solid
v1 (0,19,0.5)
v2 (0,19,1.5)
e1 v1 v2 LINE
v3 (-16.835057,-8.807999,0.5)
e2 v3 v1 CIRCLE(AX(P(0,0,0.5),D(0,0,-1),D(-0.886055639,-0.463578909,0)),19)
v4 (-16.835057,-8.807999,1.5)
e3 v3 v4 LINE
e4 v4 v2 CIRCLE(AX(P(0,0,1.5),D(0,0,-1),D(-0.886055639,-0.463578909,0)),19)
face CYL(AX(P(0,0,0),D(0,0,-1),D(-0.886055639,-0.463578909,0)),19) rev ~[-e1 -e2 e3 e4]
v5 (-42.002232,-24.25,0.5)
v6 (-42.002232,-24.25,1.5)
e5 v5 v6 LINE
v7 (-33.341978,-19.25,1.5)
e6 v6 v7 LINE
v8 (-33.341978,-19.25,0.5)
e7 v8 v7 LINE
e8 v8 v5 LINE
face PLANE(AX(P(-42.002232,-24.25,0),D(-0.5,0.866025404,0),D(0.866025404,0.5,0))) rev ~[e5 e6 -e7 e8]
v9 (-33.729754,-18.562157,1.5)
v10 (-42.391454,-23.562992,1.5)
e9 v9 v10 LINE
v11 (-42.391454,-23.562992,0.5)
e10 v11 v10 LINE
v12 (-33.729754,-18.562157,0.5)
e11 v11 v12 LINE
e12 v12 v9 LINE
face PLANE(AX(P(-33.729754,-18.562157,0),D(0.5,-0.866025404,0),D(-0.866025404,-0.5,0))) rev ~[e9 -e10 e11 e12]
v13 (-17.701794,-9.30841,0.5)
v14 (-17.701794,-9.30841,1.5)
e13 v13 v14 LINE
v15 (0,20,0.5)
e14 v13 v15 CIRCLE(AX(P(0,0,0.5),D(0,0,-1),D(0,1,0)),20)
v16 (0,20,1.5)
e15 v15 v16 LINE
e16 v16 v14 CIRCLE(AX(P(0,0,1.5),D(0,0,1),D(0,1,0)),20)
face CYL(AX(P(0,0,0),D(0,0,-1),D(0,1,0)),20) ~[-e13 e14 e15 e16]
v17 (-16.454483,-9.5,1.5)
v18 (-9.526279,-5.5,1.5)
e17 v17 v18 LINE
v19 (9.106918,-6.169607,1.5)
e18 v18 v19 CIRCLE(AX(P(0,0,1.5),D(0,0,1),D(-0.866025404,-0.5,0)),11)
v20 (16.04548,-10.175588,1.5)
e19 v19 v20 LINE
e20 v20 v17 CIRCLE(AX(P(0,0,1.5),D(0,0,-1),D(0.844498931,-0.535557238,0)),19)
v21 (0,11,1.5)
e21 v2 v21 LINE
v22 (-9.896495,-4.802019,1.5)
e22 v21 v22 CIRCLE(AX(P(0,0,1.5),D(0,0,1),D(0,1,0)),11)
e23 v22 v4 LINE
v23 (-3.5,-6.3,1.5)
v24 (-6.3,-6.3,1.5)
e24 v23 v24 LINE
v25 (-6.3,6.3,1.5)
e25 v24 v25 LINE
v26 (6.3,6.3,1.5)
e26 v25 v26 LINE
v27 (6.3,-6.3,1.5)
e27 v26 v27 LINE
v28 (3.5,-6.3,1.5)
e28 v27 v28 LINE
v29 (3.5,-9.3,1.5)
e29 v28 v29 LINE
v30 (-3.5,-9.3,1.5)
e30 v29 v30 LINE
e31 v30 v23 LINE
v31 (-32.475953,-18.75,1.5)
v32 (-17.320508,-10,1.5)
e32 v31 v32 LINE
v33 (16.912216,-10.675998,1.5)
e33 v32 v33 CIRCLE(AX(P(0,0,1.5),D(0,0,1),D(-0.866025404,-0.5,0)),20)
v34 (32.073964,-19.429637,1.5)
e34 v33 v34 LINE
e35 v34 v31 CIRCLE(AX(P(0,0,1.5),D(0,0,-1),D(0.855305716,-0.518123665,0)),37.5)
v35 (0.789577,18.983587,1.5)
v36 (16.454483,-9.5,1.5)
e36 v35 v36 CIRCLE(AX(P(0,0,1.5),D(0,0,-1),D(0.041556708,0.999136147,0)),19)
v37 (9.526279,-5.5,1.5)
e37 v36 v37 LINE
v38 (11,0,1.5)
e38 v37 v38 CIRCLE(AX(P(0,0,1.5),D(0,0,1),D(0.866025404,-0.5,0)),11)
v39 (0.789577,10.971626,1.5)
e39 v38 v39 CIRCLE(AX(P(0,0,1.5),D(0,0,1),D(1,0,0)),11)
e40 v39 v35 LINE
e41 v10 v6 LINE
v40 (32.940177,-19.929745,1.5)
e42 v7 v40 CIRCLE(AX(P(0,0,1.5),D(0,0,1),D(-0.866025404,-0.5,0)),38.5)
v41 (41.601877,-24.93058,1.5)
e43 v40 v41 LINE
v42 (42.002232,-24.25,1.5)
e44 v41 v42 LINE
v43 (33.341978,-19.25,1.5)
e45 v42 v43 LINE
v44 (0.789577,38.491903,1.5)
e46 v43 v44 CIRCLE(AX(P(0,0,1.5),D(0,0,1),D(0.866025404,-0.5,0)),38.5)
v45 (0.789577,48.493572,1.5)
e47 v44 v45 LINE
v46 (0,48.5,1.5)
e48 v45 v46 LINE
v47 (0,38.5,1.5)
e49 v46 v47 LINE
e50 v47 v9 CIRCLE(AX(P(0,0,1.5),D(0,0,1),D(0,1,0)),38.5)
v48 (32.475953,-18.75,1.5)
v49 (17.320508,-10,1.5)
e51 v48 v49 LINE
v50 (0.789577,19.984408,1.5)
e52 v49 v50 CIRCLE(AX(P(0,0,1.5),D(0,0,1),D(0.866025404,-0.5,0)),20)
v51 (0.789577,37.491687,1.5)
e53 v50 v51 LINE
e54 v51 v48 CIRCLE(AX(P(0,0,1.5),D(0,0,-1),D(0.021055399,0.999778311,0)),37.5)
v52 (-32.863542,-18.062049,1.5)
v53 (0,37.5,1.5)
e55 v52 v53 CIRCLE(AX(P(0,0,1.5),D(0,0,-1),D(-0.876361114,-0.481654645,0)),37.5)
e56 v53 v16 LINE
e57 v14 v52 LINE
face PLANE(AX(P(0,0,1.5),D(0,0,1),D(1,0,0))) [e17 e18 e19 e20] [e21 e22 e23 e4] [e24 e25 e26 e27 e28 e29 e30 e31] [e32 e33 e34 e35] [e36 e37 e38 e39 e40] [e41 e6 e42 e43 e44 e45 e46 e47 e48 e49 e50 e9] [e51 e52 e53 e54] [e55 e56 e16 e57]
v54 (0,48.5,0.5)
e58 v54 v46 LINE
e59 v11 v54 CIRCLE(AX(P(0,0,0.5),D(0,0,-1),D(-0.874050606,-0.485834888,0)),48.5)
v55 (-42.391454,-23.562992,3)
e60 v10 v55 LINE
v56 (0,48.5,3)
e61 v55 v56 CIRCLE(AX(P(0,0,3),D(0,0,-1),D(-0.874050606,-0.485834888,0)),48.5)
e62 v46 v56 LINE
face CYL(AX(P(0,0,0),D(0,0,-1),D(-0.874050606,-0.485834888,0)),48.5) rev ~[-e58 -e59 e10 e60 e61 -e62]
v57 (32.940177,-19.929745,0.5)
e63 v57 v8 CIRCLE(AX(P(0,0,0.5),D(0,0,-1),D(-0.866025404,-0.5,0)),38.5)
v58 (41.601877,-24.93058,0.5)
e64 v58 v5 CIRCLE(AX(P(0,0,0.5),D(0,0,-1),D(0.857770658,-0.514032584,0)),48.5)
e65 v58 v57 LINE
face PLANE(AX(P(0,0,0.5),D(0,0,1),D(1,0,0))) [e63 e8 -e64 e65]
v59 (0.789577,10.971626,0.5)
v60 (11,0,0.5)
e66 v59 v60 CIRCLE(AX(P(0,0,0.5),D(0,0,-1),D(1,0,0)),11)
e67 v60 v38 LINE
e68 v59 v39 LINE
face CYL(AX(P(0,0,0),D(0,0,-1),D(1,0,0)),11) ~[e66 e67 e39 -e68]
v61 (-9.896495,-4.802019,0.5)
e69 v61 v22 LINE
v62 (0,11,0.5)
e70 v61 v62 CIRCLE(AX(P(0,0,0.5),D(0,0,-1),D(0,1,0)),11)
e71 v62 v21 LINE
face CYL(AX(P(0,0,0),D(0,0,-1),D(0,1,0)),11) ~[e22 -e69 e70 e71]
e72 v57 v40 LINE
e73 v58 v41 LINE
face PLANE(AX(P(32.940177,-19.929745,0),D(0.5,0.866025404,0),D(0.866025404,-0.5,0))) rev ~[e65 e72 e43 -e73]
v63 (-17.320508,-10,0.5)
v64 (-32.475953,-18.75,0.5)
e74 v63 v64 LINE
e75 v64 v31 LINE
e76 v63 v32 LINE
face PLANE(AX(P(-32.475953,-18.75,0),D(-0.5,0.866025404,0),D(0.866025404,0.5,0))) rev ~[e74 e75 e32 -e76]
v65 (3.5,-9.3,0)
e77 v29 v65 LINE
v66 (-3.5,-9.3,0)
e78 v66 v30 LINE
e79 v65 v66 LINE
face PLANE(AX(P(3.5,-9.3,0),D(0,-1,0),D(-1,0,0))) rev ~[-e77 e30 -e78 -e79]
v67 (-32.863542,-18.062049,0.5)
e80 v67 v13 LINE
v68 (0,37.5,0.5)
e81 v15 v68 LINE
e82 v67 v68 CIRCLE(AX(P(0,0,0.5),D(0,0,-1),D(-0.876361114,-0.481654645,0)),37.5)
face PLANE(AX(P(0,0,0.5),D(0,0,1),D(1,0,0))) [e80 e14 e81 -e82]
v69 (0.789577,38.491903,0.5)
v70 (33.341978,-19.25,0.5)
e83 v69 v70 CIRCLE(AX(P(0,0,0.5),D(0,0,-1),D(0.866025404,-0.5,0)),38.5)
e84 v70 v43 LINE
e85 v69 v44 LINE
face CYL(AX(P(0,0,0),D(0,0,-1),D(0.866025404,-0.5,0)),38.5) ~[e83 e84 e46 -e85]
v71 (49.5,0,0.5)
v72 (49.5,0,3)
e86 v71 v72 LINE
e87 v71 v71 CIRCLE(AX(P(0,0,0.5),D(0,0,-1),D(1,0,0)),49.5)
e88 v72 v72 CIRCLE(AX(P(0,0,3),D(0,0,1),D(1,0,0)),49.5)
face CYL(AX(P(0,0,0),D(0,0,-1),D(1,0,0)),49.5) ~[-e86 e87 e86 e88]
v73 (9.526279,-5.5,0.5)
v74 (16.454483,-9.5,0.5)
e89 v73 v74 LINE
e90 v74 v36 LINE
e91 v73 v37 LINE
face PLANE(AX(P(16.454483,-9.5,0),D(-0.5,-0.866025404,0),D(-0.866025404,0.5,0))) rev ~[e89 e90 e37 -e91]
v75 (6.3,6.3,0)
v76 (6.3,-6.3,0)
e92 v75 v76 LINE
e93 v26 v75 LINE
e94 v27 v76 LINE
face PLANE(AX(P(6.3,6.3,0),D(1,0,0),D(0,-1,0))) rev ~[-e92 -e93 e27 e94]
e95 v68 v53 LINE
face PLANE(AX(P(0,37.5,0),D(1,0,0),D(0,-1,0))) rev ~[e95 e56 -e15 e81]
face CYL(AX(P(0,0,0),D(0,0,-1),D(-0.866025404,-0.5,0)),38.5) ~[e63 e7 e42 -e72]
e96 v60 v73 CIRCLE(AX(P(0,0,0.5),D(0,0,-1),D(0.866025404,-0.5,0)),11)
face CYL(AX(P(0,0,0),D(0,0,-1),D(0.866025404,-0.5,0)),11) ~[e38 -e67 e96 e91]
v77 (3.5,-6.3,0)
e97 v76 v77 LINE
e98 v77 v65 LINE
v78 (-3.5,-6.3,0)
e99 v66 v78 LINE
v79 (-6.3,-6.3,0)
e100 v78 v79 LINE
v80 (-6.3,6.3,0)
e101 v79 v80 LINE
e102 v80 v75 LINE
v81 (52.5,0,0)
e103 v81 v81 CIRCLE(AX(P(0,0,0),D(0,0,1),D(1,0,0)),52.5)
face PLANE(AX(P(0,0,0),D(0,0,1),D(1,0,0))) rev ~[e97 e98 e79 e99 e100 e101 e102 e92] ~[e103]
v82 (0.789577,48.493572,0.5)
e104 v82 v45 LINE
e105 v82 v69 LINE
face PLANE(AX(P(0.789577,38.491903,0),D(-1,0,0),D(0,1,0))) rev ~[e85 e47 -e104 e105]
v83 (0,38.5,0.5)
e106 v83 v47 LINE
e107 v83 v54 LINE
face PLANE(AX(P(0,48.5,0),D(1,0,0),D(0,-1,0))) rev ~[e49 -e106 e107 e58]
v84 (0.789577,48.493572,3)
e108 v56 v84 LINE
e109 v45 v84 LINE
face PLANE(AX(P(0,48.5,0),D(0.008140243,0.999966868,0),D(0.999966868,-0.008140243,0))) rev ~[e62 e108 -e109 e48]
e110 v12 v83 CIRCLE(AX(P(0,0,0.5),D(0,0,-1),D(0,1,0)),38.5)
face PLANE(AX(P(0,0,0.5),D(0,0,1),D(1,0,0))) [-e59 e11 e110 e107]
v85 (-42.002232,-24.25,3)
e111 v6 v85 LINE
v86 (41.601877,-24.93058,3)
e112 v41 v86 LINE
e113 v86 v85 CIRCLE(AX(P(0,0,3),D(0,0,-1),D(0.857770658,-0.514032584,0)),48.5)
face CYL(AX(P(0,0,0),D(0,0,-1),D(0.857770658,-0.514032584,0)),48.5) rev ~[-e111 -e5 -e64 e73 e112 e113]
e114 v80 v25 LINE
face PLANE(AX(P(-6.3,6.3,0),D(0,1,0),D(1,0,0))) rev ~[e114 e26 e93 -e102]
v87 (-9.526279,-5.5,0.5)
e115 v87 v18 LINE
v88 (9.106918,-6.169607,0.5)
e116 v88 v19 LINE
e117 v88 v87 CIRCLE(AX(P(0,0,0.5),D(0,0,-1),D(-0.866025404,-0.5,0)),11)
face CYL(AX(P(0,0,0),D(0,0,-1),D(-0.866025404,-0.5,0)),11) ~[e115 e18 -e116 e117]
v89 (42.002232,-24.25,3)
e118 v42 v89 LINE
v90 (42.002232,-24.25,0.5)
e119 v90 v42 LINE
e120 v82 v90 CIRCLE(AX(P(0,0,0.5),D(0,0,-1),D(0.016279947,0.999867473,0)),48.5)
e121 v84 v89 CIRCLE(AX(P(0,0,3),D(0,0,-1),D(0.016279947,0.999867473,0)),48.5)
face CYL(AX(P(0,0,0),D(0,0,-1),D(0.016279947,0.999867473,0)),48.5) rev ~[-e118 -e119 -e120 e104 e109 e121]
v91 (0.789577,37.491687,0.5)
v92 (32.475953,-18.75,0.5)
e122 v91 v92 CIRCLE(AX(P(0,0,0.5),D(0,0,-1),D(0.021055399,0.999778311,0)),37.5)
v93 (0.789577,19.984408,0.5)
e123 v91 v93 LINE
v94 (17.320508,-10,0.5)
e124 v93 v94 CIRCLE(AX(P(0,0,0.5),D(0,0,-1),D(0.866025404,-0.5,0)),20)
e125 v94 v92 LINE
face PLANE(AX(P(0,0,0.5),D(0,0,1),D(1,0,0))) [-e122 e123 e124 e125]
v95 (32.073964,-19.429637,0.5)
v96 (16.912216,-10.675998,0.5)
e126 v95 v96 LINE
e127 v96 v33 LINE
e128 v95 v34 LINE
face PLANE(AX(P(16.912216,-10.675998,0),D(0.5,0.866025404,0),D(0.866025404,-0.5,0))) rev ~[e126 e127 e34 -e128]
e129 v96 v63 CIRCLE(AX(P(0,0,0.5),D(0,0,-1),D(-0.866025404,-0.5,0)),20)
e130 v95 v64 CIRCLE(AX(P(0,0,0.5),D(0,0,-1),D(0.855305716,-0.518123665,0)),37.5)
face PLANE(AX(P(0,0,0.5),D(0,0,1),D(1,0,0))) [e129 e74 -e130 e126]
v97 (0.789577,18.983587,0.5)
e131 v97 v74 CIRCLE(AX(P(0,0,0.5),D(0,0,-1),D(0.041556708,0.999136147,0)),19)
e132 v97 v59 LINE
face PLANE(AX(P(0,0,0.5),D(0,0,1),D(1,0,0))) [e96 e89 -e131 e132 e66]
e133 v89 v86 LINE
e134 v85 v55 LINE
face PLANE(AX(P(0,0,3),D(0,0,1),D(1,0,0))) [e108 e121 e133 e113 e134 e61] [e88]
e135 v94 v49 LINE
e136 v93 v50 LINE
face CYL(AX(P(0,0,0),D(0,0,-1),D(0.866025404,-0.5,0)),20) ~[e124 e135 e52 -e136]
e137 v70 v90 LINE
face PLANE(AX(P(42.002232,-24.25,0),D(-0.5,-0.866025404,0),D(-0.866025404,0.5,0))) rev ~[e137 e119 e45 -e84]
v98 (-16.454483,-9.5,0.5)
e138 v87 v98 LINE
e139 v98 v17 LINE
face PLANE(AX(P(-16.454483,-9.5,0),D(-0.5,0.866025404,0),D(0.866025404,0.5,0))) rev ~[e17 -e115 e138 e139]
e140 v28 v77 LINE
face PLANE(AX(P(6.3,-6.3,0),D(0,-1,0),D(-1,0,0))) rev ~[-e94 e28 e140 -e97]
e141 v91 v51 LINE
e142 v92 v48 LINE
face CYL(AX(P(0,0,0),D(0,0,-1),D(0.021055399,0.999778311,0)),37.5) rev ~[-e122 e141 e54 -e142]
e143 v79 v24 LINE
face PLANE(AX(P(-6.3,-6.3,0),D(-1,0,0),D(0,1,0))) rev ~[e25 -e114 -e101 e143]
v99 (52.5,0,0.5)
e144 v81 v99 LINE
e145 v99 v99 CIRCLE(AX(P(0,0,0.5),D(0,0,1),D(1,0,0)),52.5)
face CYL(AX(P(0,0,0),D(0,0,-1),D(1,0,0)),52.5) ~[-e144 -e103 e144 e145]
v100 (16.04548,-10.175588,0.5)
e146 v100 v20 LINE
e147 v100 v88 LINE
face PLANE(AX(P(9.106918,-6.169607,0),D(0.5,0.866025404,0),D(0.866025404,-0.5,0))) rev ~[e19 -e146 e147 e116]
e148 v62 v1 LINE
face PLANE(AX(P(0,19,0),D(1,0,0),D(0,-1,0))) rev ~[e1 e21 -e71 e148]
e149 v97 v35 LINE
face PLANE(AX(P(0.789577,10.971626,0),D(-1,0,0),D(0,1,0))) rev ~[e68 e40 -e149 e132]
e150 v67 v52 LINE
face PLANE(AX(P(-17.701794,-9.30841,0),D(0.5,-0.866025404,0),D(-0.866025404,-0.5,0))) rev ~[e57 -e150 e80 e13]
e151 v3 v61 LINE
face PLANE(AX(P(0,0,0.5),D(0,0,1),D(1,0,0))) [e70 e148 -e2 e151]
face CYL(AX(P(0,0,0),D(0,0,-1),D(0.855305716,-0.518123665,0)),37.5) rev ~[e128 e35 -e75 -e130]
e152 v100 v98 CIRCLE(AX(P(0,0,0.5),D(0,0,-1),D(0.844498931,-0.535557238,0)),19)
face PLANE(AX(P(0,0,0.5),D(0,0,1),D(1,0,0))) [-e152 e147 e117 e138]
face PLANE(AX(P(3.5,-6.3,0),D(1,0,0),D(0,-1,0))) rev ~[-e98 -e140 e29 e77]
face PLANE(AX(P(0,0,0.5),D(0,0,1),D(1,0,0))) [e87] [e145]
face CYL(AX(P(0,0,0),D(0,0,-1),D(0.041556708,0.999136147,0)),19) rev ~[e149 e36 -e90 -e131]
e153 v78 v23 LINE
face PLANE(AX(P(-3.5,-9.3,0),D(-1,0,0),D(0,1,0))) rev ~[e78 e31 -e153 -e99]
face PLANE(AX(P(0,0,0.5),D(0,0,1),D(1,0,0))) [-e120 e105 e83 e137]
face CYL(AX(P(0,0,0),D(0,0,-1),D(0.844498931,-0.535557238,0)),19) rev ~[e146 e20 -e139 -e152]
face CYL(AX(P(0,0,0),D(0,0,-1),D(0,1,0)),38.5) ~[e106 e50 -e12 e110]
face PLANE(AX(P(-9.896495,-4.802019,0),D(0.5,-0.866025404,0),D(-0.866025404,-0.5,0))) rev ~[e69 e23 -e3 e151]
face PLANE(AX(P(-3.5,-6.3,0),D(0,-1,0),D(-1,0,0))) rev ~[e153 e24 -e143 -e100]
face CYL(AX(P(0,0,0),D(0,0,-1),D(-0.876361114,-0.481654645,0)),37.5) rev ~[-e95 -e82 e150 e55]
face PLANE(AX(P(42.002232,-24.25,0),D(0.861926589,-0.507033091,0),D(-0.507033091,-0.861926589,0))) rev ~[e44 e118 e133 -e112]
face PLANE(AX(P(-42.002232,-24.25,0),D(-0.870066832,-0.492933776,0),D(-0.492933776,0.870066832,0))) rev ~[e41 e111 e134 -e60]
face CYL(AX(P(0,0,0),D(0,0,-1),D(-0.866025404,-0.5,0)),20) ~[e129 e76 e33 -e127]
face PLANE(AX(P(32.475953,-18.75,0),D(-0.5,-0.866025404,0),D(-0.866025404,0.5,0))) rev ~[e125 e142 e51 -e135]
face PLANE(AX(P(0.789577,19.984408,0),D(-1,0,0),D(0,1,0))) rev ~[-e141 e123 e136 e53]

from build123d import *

# Parameters (mm, degrees)
F0_R     = 52.5
F0_R_2   = 49.5
F1_DEPTH = 0.5
F2_DEPTH = 3
F3_DEPTH = 1.5


# Not quite as in the source:
# - a feature names something its author has since deleted; it is built from what else it names


with BuildPart() as f1:
    # F0 (on Top) → F1 (new body)
    with BuildSketch(Plane.XY):
        Circle(F0_R)
        Circle(F0_R_2, mode=Mode.SUBTRACT)
        Circle(F0_R_2)
        with BuildLine():
            ThreePointArc((-42.3914543736, -23.5629920869), (-41.8034395488, 24.5911049344), (0, 48.5))
            Line((0, 48.5), (0.7895774504, 48.4935724344))
            ThreePointArc((0.7895774504, 48.4935724344), (42.1982413547, 23.9072881476), (42.0022320835, -24.25))
            Line((42.0022320835, -24.25), (41.6018769232, -24.9305803475))
            ThreePointArc((41.6018769232, -24.9305803475), (-0.3948018059, -48.498393082), (-42.0022320835, -24.25))
            Line((-42.0022320835, -24.25), (-42.3914543736, -23.5629920869))
        make_face(mode=Mode.SUBTRACT)
        with BuildLine():
            Line((0.7895774504, 48.4935724344), (0, 48.5))
            Line((0, 48.5), (0, 38.5))
            ThreePointArc((0, 38.5), (-33.1428201233, 19.5909028448), (-33.7297542357, -18.5621571806))
            Line((-33.7297542357, -18.5621571806), (-42.3914543736, -23.5629920869))
            Line((-42.3914543736, -23.5629920869), (-42.0022320835, -24.25))
            Line((-42.0022320835, -24.25), (-33.3419780457, -19.25))
            ThreePointArc((-33.3419780457, -19.25), (-0.394809485, -38.4979756022), (32.9401767853, -19.9297454412))
            Line((32.9401767853, -19.9297454412), (41.6018769232, -24.9305803475))
            Line((41.6018769232, -24.9305803475), (42.0022320835, -24.25))
            Line((42.0022320835, -24.25), (33.3419780457, -19.25))
            ThreePointArc((33.3419780457, -19.25), (33.5376296083, 18.9070727575), (0.7895774504, 38.4919026218))
            Line((0.7895774504, 38.4919026218), (0.7895774504, 48.4935724344))
        make_face()
        with BuildLine():
            ThreePointArc((32.0739643397, -19.4296374526), (-0.3948106071, -37.4979216035), (-32.4759526419, -18.75))
            Line((-32.4759526419, -18.75), (-17.3205080757, -10))
            ThreePointArc((-17.3205080757, -10), (-0.3948656915, -19.9961016472), (16.9122163764, -10.6759981846))
            Line((16.9122163764, -10.6759981846), (32.0739643397, -19.4296374526))
        make_face(mode=Mode.SUBTRACT)
        with BuildLine():
            Line((-17.7017938268, -9.308409924), (-32.8635417901, -18.0620491919))
            ThreePointArc((-32.8635417901, -18.0620491919), (-32.2767473942, 19.0908768172), (0, 37.5))
            Line((0, 37.5), (0, 20))
            ThreePointArc((0, 20), (-17.1196991574, 10.3400145435), (-17.7017938268, -9.308409924))
        make_face(mode=Mode.SUBTRACT)
        with BuildLine():
            ThreePointArc((0, 11), (0.3950435606, 10.9929041015), (0.7895774504, 10.971625561))
            Line((0.7895774504, 10.971625561), (0.7895774504, 18.983586791))
            ThreePointArc((0.7895774504, 18.983586791), (16.6483657305, 9.155977201), (16.4544826719, -9.5))
            Line((16.4544826719, -9.5), (9.5262794416, -5.5))
            ThreePointArc((9.5262794416, -5.5), (9.322612433, -5.8385698098), (9.1069177314, -6.1696069108))
            Line((9.1069177314, -6.1696069108), (16.0454796907, -10.1755875258))
            ThreePointArc((16.0454796907, -10.1755875258), (-0.3948740127, -18.9958962546), (-16.4544826719, -9.5))
            Line((-16.4544826719, -9.5), (-9.5262794416, -5.5))
            ThreePointArc((-9.5262794416, -5.5), (-9.7176559936, -5.1543342917), (-9.8964951818, -4.8020186502))
            Line((-9.8964951818, -4.8020186502), (-16.8350571411, -8.8079992652))
            ThreePointArc((-16.8350571411, -8.8079992652), (-16.2534917178, 9.8399190536), (0, 19))
            Line((0, 19), (0, 11))
        make_face(mode=Mode.SUBTRACT)
        with BuildLine():
            Line((32.4759526419, -18.75), (17.3205080757, -10))
            ThreePointArc((17.3205080757, -10), (17.5145648489, 9.6560871037), (0.7895774504, 19.9844081086))
            Line((0.7895774504, 19.9844081086), (0.7895774504, 37.4916866445))
            ThreePointArc((0.7895774504, 37.4916866445), (32.6715580013, 18.4070447863), (32.4759526419, -18.75))
        make_face(mode=Mode.SUBTRACT)
        with BuildLine():
            Line((-17.3205080757, -10), (-32.4759526419, -18.75))
            ThreePointArc((-32.4759526419, -18.75), (-0.3948106071, -37.4979216035), (32.0739643397, -19.4296374526))
            Line((32.0739643397, -19.4296374526), (16.9122163764, -10.6759981846))
            ThreePointArc((16.9122163764, -10.6759981846), (-0.3948656915, -19.9961016472), (-17.3205080757, -10))
        make_face()
        with BuildLine():
            ThreePointArc((0, 37.5), (-32.2767473942, 19.0908768172), (-32.8635417901, -18.0620491919))
            Line((-32.8635417901, -18.0620491919), (-17.7017938268, -9.308409924))
            ThreePointArc((-17.7017938268, -9.308409924), (-17.1196991574, 10.3400145435), (0, 20))
            Line((0, 20), (0, 37.5))
        make_face()
        with BuildLine():
            ThreePointArc((0.7895774504, 19.9844081086), (17.5145648489, 9.6560871037), (17.3205080757, -10))
            Line((17.3205080757, -10), (32.4759526419, -18.75))
            ThreePointArc((32.4759526419, -18.75), (32.6715580013, 18.4070447863), (0.7895774504, 37.4916866445))
            Line((0.7895774504, 37.4916866445), (0.7895774504, 19.9844081086))
        make_face()
        with BuildLine():
            Line((0, 38.5), (0, 48.5))
            ThreePointArc((0, 48.5), (-41.8034395488, 24.5911049344), (-42.3914543736, -23.5629920869))
            Line((-42.3914543736, -23.5629920869), (-33.7297542357, -18.5621571806))
            ThreePointArc((-33.7297542357, -18.5621571806), (-33.1428201233, 19.5909028448), (0, 38.5))
        make_face()
        with BuildLine():
            ThreePointArc((42.0022320835, -24.25), (42.1982413547, 23.9072881476), (0.7895774504, 48.4935724344))
            Line((0.7895774504, 48.4935724344), (0.7895774504, 38.4919026218))
            ThreePointArc((0.7895774504, 38.4919026218), (33.5376296083, 18.9070727575), (33.3419780457, -19.25))
            Line((33.3419780457, -19.25), (42.0022320835, -24.25))
        make_face()
        with BuildLine():
            Line((-33.3419780457, -19.25), (-42.0022320835, -24.25))
            ThreePointArc((-42.0022320835, -24.25), (-0.3948018059, -48.498393082), (41.6018769232, -24.9305803475))
            Line((41.6018769232, -24.9305803475), (32.9401767853, -19.9297454412))
            ThreePointArc((32.9401767853, -19.9297454412), (-0.394809485, -38.4979756022), (-33.3419780457, -19.25))
        make_face()
        with BuildLine():
            ThreePointArc((9.5262794416, -5.5), (10.6251840892, -2.8470094961), (11, 0))
            ThreePointArc((11, 0), (8.0524950157, 7.4938190546), (0.7895774504, 10.971625561))
            ThreePointArc((0.7895774504, 10.971625561), (0.3950435606, 10.9929041015), (0, 11))
            ThreePointArc((0, 11), (-9.322612433, 5.8385698098), (-9.8964951818, -4.8020186502))
            ThreePointArc((-9.8964951818, -4.8020186502), (-9.7176559936, -5.1543342917), (-9.5262794416, -5.5))
            ThreePointArc((-9.5262794416, -5.5), (-0.3950435606, -10.9929041015), (9.1069177314, -6.1696069108))
            ThreePointArc((9.1069177314, -6.1696069108), (9.322612433, -5.8385698098), (9.5262794416, -5.5))
        make_face()
        Polygon((6.3, 6.3), (6.3, -6.3), (3.5, -6.3), (3.5, -9.3), (-3.5, -9.3), (-3.5, -6.3), (-6.3, -6.3), (-6.3, 6.3), align=None, mode=Mode.SUBTRACT)
        with BuildLine():
            ThreePointArc((0.7895774504, 10.971625561), (8.0524950157, 7.4938190546), (11, 0))
            ThreePointArc((11, 0), (10.6251840892, -2.8470094961), (9.5262794416, -5.5))
            Line((9.5262794416, -5.5), (16.4544826719, -9.5))
            ThreePointArc((16.4544826719, -9.5), (16.6483657305, 9.155977201), (0.7895774504, 18.983586791))
            Line((0.7895774504, 18.983586791), (0.7895774504, 10.971625561))
        make_face()
        with BuildLine():
            ThreePointArc((-9.8964951818, -4.8020186502), (-9.322612433, 5.8385698098), (0, 11))
            Line((0, 11), (0, 19))
            ThreePointArc((0, 19), (-16.2534917178, 9.8399190536), (-16.8350571411, -8.8079992652))
            Line((-16.8350571411, -8.8079992652), (-9.8964951818, -4.8020186502))
        make_face()
        with BuildLine():
            Line((16.0454796907, -10.1755875258), (9.1069177314, -6.1696069108))
            ThreePointArc((9.1069177314, -6.1696069108), (-0.3950435606, -10.9929041015), (-9.5262794416, -5.5))
            Line((-9.5262794416, -5.5), (-16.4544826719, -9.5))
            ThreePointArc((-16.4544826719, -9.5), (-0.3948740127, -18.9958962546), (16.0454796907, -10.1755875258))
        make_face()
    extrude(amount=F1_DEPTH)

    # F0 (on Top) → F2 (join)
    with BuildSketch(Plane.XY):
        Circle(F0_R_2)
        with BuildLine():
            ThreePointArc((-42.3914543736, -23.5629920869), (-41.8034395488, 24.5911049344), (0, 48.5))
            Line((0, 48.5), (0.7895774504, 48.4935724344))
            ThreePointArc((0.7895774504, 48.4935724344), (42.1982413547, 23.9072881476), (42.0022320835, -24.25))
            Line((42.0022320835, -24.25), (41.6018769232, -24.9305803475))
            ThreePointArc((41.6018769232, -24.9305803475), (-0.3948018059, -48.498393082), (-42.0022320835, -24.25))
            Line((-42.0022320835, -24.25), (-42.3914543736, -23.5629920869))
        make_face(mode=Mode.SUBTRACT)
    extrude(amount=F2_DEPTH)

    # F0 (on Top) → F3 (join)
    with BuildSketch(Plane.XY):
        with BuildLine():
            Line((0.7895774504, 48.4935724344), (0, 48.5))
            Line((0, 48.5), (0, 38.5))
            ThreePointArc((0, 38.5), (-33.1428201233, 19.5909028448), (-33.7297542357, -18.5621571806))
            Line((-33.7297542357, -18.5621571806), (-42.3914543736, -23.5629920869))
            Line((-42.3914543736, -23.5629920869), (-42.0022320835, -24.25))
            Line((-42.0022320835, -24.25), (-33.3419780457, -19.25))
            ThreePointArc((-33.3419780457, -19.25), (-0.394809485, -38.4979756022), (32.9401767853, -19.9297454412))
            Line((32.9401767853, -19.9297454412), (41.6018769232, -24.9305803475))
            Line((41.6018769232, -24.9305803475), (42.0022320835, -24.25))
            Line((42.0022320835, -24.25), (33.3419780457, -19.25))
            ThreePointArc((33.3419780457, -19.25), (33.5376296083, 18.9070727575), (0.7895774504, 38.4919026218))
            Line((0.7895774504, 38.4919026218), (0.7895774504, 48.4935724344))
        make_face()
        with BuildLine():
            ThreePointArc((32.0739643397, -19.4296374526), (-0.3948106071, -37.4979216035), (-32.4759526419, -18.75))
            Line((-32.4759526419, -18.75), (-17.3205080757, -10))
            ThreePointArc((-17.3205080757, -10), (-0.3948656915, -19.9961016472), (16.9122163764, -10.6759981846))
            Line((16.9122163764, -10.6759981846), (32.0739643397, -19.4296374526))
        make_face(mode=Mode.SUBTRACT)
        with BuildLine():
            Line((-17.7017938268, -9.308409924), (-32.8635417901, -18.0620491919))
            ThreePointArc((-32.8635417901, -18.0620491919), (-32.2767473942, 19.0908768172), (0, 37.5))
            Line((0, 37.5), (0, 20))
            ThreePointArc((0, 20), (-17.1196991574, 10.3400145435), (-17.7017938268, -9.308409924))
        make_face(mode=Mode.SUBTRACT)
        with BuildLine():
            ThreePointArc((0, 11), (0.3950435606, 10.9929041015), (0.7895774504, 10.971625561))
            Line((0.7895774504, 10.971625561), (0.7895774504, 18.983586791))
            ThreePointArc((0.7895774504, 18.983586791), (16.6483657305, 9.155977201), (16.4544826719, -9.5))
            Line((16.4544826719, -9.5), (9.5262794416, -5.5))
            ThreePointArc((9.5262794416, -5.5), (9.322612433, -5.8385698098), (9.1069177314, -6.1696069108))
            Line((9.1069177314, -6.1696069108), (16.0454796907, -10.1755875258))
            ThreePointArc((16.0454796907, -10.1755875258), (-0.3948740127, -18.9958962546), (-16.4544826719, -9.5))
            Line((-16.4544826719, -9.5), (-9.5262794416, -5.5))
            ThreePointArc((-9.5262794416, -5.5), (-9.7176559936, -5.1543342917), (-9.8964951818, -4.8020186502))
            Line((-9.8964951818, -4.8020186502), (-16.8350571411, -8.8079992652))
            ThreePointArc((-16.8350571411, -8.8079992652), (-16.2534917178, 9.8399190536), (0, 19))
            Line((0, 19), (0, 11))
        make_face(mode=Mode.SUBTRACT)
        with BuildLine():
            Line((32.4759526419, -18.75), (17.3205080757, -10))
            ThreePointArc((17.3205080757, -10), (17.5145648489, 9.6560871037), (0.7895774504, 19.9844081086))
            Line((0.7895774504, 19.9844081086), (0.7895774504, 37.4916866445))
            ThreePointArc((0.7895774504, 37.4916866445), (32.6715580013, 18.4070447863), (32.4759526419, -18.75))
        make_face(mode=Mode.SUBTRACT)
        with BuildLine():
            ThreePointArc((9.5262794416, -5.5), (10.6251840892, -2.8470094961), (11, 0))
            ThreePointArc((11, 0), (8.0524950157, 7.4938190546), (0.7895774504, 10.971625561))
            ThreePointArc((0.7895774504, 10.971625561), (0.3950435606, 10.9929041015), (0, 11))
            ThreePointArc((0, 11), (-9.322612433, 5.8385698098), (-9.8964951818, -4.8020186502))
            ThreePointArc((-9.8964951818, -4.8020186502), (-9.7176559936, -5.1543342917), (-9.5262794416, -5.5))
            ThreePointArc((-9.5262794416, -5.5), (-0.3950435606, -10.9929041015), (9.1069177314, -6.1696069108))
            ThreePointArc((9.1069177314, -6.1696069108), (9.322612433, -5.8385698098), (9.5262794416, -5.5))
        make_face()
        Polygon((6.3, 6.3), (6.3, -6.3), (3.5, -6.3), (3.5, -9.3), (-3.5, -9.3), (-3.5, -6.3), (-6.3, -6.3), (-6.3, 6.3), align=None, mode=Mode.SUBTRACT)
    extrude(amount=F3_DEPTH)


solid = f1.part
